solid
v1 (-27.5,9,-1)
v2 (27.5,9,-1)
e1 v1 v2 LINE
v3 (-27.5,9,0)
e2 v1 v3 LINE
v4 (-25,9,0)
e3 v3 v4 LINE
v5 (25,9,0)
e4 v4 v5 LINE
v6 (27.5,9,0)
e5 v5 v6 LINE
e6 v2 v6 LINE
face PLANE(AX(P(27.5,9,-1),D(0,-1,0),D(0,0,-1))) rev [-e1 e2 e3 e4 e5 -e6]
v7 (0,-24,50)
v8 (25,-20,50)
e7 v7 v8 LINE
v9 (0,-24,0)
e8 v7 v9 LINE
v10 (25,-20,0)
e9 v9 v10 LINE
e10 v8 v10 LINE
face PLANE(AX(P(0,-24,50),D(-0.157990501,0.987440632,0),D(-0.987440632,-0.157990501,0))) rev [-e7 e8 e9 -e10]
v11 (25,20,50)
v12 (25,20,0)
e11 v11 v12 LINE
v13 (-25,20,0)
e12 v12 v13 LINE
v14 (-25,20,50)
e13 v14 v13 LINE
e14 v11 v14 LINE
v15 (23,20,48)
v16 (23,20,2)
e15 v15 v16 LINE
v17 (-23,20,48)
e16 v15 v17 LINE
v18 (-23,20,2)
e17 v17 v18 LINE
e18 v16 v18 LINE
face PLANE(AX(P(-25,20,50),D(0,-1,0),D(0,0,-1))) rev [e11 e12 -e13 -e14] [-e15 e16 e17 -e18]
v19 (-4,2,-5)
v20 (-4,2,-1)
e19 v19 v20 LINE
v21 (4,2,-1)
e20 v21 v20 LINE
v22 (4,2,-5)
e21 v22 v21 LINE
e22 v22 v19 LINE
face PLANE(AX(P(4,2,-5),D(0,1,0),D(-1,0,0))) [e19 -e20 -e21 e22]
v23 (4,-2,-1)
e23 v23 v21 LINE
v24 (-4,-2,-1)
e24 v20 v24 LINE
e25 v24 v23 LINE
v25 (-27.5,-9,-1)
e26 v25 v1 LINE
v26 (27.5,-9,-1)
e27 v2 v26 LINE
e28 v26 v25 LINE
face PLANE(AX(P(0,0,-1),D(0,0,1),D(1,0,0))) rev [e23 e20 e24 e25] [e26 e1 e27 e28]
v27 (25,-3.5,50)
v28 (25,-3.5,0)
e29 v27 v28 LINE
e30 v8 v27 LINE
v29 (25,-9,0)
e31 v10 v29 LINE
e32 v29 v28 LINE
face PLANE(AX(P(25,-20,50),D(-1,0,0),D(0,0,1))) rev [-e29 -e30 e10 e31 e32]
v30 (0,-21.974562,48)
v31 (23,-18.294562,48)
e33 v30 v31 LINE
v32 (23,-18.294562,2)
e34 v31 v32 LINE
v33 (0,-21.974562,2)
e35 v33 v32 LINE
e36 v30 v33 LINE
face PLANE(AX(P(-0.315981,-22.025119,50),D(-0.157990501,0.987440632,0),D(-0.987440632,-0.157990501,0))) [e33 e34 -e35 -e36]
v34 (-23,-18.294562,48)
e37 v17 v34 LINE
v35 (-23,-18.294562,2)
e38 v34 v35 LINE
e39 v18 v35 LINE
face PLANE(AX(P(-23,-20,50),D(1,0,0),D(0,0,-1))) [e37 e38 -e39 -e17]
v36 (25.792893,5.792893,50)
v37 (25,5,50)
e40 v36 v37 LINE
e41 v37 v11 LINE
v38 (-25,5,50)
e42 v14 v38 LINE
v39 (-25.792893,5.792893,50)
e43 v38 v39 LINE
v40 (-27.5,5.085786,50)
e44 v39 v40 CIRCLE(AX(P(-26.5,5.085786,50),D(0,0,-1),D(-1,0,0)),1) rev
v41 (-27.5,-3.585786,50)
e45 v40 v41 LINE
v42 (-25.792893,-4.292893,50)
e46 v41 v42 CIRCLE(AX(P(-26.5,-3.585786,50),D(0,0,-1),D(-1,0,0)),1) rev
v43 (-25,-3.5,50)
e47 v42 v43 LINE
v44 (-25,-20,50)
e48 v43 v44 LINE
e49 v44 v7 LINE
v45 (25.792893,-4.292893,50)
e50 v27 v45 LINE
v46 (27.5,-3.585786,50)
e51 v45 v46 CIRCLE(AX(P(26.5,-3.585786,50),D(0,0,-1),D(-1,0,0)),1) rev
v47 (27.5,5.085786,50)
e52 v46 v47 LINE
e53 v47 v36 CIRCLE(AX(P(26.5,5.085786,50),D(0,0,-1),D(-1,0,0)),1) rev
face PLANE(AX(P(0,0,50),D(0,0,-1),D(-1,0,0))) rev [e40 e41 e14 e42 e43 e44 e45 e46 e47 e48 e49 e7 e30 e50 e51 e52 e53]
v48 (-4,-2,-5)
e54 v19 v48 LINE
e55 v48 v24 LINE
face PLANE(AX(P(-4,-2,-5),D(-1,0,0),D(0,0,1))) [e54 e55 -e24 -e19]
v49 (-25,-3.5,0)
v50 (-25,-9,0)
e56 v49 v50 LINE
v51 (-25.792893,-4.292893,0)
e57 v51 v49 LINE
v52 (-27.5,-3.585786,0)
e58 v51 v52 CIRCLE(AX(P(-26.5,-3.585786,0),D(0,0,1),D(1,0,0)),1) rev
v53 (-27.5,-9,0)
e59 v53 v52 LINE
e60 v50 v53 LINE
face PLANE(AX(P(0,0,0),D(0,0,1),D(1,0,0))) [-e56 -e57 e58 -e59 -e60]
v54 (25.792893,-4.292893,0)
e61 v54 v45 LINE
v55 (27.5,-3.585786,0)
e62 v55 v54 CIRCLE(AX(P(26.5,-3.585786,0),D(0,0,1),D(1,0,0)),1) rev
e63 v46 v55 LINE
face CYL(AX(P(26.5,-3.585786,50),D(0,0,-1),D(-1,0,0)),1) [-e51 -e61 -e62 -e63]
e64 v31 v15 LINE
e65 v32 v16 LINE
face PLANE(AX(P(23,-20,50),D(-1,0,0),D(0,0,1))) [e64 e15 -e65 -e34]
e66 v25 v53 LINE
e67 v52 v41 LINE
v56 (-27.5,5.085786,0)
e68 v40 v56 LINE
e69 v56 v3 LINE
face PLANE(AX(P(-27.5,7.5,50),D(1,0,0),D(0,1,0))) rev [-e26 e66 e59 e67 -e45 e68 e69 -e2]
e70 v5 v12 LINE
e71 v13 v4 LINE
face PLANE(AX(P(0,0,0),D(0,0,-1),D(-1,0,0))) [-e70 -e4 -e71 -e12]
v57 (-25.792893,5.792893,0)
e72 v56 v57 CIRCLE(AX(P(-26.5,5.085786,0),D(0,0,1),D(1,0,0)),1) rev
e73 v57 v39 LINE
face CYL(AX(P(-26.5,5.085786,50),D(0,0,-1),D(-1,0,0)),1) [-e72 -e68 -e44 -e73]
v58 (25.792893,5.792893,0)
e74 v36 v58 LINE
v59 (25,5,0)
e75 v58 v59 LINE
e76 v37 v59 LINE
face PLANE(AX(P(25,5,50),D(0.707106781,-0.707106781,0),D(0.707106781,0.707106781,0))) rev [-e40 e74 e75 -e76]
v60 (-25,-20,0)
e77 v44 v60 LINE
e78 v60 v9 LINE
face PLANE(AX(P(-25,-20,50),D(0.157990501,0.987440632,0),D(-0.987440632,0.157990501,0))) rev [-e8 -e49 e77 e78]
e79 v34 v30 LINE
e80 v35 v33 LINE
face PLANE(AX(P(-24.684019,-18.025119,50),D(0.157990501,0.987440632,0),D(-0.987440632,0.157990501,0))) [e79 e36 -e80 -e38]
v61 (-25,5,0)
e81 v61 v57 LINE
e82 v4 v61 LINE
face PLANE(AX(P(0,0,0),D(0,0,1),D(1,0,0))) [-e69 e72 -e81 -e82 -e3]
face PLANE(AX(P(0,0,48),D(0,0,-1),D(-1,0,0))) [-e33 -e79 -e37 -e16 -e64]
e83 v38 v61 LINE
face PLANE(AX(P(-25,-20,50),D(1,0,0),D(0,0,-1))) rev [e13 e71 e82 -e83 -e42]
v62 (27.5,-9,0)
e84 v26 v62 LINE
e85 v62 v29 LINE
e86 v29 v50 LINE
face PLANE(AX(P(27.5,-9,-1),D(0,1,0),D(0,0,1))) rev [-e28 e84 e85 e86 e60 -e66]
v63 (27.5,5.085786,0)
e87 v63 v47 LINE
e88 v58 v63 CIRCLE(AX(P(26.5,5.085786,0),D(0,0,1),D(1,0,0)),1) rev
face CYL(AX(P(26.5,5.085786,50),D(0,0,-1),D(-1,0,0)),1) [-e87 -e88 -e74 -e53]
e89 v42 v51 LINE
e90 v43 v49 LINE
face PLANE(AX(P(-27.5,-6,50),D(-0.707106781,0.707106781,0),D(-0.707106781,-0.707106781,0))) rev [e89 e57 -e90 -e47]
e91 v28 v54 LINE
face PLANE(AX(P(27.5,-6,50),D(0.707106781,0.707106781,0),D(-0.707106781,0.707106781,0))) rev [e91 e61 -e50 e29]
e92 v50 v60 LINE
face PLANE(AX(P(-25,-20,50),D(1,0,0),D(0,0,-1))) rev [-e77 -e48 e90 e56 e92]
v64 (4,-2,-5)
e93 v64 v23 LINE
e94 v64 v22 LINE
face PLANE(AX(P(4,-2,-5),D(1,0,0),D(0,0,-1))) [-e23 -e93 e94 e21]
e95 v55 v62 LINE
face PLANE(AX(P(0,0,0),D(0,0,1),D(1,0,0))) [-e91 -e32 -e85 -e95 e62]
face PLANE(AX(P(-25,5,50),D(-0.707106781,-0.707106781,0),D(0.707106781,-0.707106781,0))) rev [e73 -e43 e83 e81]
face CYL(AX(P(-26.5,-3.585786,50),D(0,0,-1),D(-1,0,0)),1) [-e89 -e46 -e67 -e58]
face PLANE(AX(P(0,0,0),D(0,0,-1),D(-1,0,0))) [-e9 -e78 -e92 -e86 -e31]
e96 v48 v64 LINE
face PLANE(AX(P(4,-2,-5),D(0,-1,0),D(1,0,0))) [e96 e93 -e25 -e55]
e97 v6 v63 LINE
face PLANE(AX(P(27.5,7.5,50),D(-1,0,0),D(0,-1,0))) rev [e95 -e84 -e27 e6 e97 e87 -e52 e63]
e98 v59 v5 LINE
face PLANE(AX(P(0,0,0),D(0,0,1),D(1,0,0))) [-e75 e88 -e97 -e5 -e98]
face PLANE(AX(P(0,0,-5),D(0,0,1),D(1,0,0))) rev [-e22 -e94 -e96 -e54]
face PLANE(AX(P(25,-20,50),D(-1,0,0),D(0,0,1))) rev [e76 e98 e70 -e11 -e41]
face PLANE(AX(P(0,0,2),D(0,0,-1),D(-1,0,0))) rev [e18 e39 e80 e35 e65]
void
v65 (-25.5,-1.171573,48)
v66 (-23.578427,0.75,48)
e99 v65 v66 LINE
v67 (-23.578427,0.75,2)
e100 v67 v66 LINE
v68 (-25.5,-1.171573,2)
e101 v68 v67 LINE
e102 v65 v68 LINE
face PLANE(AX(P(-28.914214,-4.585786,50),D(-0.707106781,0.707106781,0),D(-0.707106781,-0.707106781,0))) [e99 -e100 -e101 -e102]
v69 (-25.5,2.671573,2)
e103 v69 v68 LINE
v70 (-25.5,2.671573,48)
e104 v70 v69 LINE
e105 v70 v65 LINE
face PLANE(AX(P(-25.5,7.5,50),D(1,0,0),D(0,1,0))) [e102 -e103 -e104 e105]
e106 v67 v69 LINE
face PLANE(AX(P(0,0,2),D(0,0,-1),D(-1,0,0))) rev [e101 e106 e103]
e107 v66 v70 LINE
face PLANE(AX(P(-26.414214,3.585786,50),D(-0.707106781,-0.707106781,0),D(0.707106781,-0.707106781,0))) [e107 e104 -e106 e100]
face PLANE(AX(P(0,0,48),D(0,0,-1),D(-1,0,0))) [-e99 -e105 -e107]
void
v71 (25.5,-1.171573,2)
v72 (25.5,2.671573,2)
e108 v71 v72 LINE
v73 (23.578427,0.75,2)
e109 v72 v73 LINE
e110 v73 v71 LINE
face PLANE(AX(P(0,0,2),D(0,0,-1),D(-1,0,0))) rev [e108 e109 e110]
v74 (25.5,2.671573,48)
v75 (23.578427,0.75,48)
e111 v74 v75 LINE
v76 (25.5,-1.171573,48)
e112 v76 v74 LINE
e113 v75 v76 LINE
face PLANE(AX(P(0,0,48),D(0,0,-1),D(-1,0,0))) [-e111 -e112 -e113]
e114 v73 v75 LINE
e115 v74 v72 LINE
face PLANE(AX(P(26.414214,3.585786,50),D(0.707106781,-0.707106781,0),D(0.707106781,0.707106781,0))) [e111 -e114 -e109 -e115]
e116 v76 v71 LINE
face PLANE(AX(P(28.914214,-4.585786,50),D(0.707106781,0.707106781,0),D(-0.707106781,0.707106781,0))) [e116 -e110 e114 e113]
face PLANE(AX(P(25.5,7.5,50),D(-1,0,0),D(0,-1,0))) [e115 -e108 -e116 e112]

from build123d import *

# Parameters (mm, degrees)
EXTRUDE_1_DEPTH = 50
EXTRUDE_4_DEPTH = 50
SHELL_START     = 2
SHELL_1_DEPTH   = 46
SKETCH_4_W      = 55
SKETCH_4_H      = 18
EXTRUDE_5_DEPTH = 1
SKETCH_5_W      = 8
SKETCH_5_H      = 4
EXTRUDE_6_DEPTH = 5
FILLET_1_R      = 1


# Read off the part's stored shape, not the designer's step: 抽壳1
with BuildPart() as part:
    # 草图2 → 凸台-拉伸1 (new body)
    with BuildSketch(Plane.XY):
        Polygon((-25, -20), (0, -24), (25, -20), (25, 20), (-25, 20), align=None)
    extrude(amount=EXTRUDE_1_DEPTH)

    # 草图3 → 凸台-拉伸4 (add)
    with BuildSketch(Plane.XY):
        Polygon((-25, 5), (-27.5, 7.5), (-27.5, -6), (-25, -3.5), align=None)
        Polygon((27.5, -6), (25, -3.5), (25, 5), (27.5, 7.5), align=None)
    extrude(amount=EXTRUDE_4_DEPTH)

    # 抽壳1 outline → 抽壳1 (cut)
    with BuildSketch(Plane.XY.offset(SHELL_START)):
        Polygon((23, -18.294561776), (23, 20), (-23, 20), (-23, -18.294561776), (0, -21.974561776), align=None)
        Polygon((-25.5, -1.171572875), (-23.578427125, 0.75), (-25.5, 2.671572875), align=None)
        Polygon((23.578427125, 0.75), (25.5, -1.171572875), (25.5, 2.671572875), align=None)
    extrude(amount=SHELL_1_DEPTH, mode=Mode.SUBTRACT)

    # 草图4 → 凸台-拉伸5 (add)
    with BuildSketch(Plane(origin=(0, 0, 0), x_dir=(-1, 0, 0), z_dir=(0, 0, -1))):
        Rectangle(SKETCH_4_W, SKETCH_4_H)
    extrude(amount=EXTRUDE_5_DEPTH)

    # 草图5 → 凸台-拉伸6 (add)
    with BuildSketch(Plane.XY):
        Rectangle(SKETCH_5_W, SKETCH_5_H)
    extrude(amount=-EXTRUDE_6_DEPTH)

    # 圆角1
    fillet_1_edges = [part.edges().sort_by_distance(p)[0] for p in [
        (-27.5, 7.5, 25),
        (-27.5, -6, 25),
        (27.5, -6, 25),
        (27.5, 7.5, 25),
    ]]
    fillet(fillet_1_edges, radius=FILLET_1_R)


solid = part.part
